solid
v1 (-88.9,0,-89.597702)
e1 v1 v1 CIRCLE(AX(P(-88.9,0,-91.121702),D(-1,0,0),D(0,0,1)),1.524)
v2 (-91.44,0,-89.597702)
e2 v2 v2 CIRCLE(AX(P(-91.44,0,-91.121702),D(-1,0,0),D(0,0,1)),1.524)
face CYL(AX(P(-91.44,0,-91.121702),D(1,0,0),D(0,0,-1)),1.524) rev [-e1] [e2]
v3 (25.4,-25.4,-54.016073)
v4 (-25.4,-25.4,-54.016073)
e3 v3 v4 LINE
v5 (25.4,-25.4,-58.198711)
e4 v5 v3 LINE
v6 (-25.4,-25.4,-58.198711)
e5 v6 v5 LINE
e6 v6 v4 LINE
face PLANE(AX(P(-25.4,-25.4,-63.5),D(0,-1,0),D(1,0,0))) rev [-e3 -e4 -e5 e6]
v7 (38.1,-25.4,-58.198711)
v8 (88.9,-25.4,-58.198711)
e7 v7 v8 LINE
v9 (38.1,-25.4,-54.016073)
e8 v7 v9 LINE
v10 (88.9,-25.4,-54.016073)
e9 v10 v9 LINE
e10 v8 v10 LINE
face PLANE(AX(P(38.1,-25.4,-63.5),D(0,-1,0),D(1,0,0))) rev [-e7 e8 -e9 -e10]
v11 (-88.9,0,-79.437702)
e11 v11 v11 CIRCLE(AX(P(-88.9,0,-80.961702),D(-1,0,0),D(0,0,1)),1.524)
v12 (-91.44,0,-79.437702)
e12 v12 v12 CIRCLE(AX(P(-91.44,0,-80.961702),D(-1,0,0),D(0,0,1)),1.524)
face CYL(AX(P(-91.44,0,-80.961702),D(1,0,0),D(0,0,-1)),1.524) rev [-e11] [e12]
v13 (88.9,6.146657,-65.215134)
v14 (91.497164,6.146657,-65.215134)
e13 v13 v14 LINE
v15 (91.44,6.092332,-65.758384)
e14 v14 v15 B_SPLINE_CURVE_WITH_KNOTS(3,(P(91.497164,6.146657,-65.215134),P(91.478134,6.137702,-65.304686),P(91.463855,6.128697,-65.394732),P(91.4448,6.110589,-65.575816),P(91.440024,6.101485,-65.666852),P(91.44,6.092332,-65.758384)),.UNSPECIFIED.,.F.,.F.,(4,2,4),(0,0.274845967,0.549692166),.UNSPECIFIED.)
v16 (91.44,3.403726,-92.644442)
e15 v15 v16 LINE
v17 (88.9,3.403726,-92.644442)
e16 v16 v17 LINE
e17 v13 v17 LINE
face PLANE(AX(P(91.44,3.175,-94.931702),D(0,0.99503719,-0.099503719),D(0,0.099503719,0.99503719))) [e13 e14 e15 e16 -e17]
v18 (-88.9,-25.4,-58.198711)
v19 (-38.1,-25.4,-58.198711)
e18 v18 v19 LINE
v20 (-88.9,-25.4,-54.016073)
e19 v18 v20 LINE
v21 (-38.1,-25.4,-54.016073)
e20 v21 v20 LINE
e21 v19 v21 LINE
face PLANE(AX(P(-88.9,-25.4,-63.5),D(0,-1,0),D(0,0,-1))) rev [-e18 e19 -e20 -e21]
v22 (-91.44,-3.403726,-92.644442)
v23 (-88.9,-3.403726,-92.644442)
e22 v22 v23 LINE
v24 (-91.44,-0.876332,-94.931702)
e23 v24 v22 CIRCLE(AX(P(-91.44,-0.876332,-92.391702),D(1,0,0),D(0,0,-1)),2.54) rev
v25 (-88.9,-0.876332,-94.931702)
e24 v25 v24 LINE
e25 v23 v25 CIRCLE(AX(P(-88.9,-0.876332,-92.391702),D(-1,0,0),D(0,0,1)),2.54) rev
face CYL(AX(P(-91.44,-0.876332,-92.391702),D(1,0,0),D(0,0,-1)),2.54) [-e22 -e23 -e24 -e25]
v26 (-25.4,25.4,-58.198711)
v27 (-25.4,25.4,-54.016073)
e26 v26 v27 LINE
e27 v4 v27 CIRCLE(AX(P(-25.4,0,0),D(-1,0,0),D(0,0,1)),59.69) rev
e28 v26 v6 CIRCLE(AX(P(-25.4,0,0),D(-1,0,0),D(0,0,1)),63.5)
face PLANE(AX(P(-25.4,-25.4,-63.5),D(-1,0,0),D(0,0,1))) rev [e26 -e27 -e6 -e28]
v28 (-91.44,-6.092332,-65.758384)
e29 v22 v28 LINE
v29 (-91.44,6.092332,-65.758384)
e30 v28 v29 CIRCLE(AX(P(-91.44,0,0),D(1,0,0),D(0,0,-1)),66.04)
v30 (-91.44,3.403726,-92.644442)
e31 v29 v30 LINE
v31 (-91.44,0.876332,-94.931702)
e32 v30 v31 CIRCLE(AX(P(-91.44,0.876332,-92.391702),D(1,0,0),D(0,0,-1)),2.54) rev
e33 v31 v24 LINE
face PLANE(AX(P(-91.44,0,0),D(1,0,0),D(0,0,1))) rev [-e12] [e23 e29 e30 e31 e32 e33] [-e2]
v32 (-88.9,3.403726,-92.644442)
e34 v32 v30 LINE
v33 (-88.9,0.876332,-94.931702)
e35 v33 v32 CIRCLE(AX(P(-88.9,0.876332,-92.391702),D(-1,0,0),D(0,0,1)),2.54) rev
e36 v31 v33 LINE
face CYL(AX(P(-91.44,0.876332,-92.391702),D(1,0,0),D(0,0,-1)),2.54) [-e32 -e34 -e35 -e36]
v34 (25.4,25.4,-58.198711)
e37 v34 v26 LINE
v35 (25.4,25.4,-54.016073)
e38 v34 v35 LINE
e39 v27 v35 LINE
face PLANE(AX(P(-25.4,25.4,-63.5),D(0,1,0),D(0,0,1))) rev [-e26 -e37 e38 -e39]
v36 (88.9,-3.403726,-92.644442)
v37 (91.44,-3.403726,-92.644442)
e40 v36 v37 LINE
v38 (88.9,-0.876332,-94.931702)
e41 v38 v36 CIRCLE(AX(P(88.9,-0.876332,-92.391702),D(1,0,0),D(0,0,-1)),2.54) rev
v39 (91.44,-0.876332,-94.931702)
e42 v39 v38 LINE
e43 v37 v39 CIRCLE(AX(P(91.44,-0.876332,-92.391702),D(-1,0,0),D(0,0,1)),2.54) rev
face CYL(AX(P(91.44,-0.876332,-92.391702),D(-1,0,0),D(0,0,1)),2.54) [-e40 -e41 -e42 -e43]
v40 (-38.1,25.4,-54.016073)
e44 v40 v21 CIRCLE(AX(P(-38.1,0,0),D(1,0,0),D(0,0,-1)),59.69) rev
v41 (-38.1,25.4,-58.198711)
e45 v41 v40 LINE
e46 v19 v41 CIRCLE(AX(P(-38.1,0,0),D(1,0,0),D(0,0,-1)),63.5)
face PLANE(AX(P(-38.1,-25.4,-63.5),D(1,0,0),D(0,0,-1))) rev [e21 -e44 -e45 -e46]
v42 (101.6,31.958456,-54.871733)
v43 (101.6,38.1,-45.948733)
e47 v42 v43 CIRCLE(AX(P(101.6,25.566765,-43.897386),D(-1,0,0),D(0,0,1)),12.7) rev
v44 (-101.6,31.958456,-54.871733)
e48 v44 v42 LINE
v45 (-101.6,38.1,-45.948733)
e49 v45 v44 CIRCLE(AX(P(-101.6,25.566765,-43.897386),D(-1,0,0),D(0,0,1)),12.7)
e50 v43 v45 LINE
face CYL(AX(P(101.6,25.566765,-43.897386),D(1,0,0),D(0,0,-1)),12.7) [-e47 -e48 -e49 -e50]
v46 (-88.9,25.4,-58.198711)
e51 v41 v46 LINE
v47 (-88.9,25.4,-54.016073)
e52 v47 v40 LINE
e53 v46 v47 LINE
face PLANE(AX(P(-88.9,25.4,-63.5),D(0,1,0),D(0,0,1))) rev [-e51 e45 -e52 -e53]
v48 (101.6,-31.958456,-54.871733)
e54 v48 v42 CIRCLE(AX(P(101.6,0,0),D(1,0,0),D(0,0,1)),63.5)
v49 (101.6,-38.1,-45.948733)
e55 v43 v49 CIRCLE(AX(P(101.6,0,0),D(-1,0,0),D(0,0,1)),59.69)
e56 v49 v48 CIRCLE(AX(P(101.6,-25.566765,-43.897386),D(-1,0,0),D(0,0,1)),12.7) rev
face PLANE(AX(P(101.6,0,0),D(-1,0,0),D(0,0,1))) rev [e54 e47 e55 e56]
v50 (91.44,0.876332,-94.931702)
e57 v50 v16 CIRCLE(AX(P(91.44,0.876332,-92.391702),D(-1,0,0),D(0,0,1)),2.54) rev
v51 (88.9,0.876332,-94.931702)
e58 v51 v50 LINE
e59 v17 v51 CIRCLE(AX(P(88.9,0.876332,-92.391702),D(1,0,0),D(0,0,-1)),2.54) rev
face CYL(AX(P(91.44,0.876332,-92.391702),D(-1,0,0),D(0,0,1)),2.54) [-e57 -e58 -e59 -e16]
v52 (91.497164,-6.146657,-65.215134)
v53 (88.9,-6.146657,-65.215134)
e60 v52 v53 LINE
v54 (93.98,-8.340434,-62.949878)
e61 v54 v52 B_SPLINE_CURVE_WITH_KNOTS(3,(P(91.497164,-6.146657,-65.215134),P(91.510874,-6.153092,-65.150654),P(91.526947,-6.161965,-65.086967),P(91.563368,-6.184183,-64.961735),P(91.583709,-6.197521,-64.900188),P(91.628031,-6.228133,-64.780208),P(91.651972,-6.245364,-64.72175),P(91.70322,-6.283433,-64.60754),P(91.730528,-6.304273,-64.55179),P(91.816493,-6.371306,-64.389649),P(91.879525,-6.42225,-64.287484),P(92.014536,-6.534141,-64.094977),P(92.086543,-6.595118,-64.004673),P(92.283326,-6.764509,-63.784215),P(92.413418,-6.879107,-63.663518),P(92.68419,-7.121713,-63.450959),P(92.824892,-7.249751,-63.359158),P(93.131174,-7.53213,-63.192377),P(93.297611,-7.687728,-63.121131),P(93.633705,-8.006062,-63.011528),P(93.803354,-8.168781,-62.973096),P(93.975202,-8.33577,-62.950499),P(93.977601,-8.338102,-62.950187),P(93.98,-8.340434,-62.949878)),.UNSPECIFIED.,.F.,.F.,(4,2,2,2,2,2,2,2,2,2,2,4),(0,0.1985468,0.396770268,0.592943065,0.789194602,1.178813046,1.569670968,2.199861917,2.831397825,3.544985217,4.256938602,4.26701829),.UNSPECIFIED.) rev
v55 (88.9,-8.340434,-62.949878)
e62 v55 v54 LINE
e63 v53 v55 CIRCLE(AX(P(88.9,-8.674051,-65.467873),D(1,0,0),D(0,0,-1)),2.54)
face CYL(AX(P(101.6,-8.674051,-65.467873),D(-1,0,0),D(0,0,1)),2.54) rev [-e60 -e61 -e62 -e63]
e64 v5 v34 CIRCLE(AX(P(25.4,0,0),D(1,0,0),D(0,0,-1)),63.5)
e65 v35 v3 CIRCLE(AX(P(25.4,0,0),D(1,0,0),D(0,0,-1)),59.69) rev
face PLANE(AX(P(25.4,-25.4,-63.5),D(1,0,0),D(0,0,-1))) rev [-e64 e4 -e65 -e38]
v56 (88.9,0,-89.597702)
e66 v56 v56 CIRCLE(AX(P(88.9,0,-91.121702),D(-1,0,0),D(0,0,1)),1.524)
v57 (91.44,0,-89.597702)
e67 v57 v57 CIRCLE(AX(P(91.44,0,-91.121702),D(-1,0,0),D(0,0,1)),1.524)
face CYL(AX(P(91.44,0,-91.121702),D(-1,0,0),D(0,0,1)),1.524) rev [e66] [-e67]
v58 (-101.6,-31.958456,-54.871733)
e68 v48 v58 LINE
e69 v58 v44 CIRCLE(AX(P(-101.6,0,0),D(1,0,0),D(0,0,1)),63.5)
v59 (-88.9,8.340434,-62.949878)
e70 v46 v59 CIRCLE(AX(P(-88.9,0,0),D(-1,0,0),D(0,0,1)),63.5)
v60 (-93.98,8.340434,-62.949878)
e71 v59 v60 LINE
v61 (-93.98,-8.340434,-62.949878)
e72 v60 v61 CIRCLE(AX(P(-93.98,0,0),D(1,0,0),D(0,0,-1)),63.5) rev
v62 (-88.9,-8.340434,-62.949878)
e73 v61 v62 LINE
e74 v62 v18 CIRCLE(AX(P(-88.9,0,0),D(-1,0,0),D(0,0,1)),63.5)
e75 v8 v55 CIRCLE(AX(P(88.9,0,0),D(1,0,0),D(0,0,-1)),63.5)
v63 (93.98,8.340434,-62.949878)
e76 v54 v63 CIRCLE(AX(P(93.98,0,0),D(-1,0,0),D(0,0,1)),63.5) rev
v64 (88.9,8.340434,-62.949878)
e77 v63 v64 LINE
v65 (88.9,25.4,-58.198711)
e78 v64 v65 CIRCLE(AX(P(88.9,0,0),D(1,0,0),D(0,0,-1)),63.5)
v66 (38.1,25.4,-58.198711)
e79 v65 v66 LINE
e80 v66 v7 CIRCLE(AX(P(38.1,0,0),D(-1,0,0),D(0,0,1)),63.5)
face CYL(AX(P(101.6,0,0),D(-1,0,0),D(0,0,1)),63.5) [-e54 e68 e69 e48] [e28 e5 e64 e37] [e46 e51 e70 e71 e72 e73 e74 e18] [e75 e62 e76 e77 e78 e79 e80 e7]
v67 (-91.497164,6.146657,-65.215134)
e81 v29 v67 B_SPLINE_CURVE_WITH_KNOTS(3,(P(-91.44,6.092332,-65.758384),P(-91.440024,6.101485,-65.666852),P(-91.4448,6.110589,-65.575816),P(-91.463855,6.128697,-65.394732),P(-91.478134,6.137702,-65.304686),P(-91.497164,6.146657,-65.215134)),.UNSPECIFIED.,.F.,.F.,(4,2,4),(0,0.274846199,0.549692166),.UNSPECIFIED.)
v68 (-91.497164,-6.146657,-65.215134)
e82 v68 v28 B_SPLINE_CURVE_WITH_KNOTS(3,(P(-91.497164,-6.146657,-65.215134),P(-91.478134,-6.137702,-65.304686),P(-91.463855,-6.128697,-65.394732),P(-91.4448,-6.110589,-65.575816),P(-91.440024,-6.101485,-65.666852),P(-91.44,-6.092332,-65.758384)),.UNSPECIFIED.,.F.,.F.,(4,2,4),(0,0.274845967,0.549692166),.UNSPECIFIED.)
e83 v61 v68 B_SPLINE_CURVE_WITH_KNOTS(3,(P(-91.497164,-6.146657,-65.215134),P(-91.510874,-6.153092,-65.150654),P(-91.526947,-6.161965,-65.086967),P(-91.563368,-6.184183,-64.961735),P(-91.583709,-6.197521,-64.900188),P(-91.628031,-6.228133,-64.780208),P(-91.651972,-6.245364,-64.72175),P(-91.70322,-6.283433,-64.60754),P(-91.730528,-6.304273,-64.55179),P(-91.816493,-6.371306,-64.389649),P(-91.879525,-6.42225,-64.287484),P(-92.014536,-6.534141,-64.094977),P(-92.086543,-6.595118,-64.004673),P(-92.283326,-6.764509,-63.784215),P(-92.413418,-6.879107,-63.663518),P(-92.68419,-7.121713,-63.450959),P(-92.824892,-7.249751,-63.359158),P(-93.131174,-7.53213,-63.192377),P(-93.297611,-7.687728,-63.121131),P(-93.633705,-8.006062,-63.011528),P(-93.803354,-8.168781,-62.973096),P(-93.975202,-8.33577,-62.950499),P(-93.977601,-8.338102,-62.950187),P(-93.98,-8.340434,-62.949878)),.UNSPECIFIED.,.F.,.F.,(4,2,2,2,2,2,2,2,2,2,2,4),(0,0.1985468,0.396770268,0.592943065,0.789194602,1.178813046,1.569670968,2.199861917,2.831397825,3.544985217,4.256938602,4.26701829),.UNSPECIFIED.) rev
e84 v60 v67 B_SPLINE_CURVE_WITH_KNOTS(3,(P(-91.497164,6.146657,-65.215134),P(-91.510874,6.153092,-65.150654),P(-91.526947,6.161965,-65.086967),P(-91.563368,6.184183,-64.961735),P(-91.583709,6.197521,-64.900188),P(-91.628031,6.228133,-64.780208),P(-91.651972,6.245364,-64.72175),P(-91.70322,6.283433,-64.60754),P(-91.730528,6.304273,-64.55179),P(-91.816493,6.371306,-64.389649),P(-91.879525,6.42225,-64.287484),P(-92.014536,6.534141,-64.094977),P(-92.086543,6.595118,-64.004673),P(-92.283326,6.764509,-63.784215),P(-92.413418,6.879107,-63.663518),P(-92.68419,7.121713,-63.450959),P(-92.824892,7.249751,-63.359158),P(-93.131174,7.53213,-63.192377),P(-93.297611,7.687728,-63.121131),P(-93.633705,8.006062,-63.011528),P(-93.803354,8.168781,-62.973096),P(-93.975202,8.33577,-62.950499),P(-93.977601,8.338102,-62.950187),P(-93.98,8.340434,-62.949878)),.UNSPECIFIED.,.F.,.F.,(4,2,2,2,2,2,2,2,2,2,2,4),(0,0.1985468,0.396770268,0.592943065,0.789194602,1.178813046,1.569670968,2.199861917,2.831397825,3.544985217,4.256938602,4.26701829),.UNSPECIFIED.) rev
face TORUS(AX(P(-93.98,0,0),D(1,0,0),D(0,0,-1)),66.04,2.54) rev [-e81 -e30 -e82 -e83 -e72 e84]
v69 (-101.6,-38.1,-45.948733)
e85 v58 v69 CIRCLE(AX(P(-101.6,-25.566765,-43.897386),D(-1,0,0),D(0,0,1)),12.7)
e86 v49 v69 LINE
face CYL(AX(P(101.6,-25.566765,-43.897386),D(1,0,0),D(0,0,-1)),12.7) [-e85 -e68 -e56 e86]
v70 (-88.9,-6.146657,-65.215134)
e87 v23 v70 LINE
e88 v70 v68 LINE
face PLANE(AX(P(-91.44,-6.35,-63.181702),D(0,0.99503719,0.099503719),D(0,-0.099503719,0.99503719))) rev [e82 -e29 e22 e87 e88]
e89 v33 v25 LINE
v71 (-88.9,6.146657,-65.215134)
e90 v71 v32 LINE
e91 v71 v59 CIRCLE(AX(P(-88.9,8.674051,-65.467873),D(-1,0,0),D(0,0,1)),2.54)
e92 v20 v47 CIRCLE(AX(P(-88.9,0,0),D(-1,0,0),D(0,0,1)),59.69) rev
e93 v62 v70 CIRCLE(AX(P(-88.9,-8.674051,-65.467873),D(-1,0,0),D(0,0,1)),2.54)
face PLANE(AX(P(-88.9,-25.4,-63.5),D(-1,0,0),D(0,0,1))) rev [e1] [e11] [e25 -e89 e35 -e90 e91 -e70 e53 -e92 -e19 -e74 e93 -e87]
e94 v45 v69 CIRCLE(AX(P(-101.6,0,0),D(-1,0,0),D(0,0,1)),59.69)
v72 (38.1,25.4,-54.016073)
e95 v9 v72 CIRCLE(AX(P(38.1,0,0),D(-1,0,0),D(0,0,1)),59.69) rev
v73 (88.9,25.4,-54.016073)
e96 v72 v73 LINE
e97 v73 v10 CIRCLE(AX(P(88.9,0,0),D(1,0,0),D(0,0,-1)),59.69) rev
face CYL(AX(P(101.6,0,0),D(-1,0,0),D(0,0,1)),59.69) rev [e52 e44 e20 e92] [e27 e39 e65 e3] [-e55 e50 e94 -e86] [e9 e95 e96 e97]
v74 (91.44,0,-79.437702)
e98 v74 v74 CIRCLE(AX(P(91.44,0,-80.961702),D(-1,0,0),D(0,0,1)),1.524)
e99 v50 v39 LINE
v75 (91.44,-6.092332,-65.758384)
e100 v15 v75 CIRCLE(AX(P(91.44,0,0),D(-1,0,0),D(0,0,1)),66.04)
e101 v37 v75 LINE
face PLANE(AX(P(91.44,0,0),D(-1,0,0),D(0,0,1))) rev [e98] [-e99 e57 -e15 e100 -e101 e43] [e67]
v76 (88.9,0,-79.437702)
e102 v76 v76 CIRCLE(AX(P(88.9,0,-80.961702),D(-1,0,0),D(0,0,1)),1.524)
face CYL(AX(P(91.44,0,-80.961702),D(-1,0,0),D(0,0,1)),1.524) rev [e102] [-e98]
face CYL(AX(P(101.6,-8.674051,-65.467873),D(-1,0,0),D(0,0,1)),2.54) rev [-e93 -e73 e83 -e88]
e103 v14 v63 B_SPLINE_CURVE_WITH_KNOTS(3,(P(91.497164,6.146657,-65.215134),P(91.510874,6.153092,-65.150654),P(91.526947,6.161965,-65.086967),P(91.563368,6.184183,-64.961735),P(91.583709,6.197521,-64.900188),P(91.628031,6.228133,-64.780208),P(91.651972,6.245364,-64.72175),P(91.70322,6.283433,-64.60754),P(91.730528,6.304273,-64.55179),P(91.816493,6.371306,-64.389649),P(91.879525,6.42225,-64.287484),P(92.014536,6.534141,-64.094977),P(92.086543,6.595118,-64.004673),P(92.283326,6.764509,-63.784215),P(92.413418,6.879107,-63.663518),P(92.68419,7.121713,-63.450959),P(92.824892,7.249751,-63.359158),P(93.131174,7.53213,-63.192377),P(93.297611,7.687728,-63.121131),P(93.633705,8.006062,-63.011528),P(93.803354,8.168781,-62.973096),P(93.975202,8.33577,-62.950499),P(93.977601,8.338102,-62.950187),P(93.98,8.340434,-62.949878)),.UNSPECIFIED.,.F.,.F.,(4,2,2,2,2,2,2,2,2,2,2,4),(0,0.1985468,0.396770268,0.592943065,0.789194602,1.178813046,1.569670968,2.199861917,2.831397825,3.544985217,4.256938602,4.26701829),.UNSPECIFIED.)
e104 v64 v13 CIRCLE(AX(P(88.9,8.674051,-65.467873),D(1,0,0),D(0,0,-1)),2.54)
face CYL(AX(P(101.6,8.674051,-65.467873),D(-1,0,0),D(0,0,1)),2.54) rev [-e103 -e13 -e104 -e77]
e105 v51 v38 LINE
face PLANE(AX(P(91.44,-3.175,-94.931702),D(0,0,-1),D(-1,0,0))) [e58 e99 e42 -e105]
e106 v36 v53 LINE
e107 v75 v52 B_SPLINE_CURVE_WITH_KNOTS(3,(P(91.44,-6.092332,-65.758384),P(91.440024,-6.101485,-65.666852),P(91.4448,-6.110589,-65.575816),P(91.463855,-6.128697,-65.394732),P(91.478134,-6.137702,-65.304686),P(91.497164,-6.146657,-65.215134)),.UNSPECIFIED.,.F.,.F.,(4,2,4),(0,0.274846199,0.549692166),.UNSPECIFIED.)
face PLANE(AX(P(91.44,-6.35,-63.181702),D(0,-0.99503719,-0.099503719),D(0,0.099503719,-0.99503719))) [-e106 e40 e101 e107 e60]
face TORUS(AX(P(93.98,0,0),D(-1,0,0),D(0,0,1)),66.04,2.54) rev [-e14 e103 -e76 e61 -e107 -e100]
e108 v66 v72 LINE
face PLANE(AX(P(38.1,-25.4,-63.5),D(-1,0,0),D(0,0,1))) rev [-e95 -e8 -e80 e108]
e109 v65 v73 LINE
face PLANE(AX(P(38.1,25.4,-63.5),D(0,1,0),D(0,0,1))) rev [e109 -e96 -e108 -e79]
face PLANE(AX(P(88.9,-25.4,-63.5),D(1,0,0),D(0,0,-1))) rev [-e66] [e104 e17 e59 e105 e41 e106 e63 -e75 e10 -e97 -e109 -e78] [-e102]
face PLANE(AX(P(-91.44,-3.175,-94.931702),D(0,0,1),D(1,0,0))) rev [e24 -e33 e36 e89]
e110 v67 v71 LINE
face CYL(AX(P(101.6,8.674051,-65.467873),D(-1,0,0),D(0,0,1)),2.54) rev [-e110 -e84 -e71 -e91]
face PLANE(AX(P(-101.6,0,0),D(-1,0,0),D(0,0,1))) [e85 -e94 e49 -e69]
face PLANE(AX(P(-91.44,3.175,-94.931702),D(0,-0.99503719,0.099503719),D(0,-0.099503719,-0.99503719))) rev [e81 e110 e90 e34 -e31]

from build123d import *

# Parameters (mm, degrees)
BOSS_EXTRUDE1_DEPTH = 101.6
SKETCH2_W           = 50.8
SKETCH2_H           = 50.8
CUT_EXTRUDE1_DEPTH  = 126.723585695
FILLET1_R           = 12.7
BOSS_EXTRUDE4_START = -2.54
SKETCH6_R           = 1.524
BOSS_EXTRUDE4_DEPTH = 2.54
FILLET4_R           = 2.54


with BuildPart() as part:
    # Sketch1 → Boss-Extrude1 (new, symmetric)
    with BuildSketch(Plane(origin=(0, 0, 0), x_dir=(0, 0, -1), z_dir=(1, 0, 0))):
        with BuildLine():
            Line((50.8, -38.1), (45.948733388, -38.1))
            ThreePointArc((45.948733388, -38.1), (59.69, 0), (45.948733388, 38.1))
            Line((45.948733388, 38.1), (50.8, 38.1))
            ThreePointArc((50.8, 38.1), (63.5, 0), (50.8, -38.1))
        make_face()
    extrude(amount=BOSS_EXTRUDE1_DEPTH, both=True)

    # Sketch2 → Cut-Extrude1 (cut, through all)
    with BuildSketch(Plane.XY):
        with Locations((-63.5, 0)):
            Rectangle(SKETCH2_W, SKETCH2_H)
        with Locations((63.5, 0)):
            Rectangle(SKETCH2_W, SKETCH2_H)
        Rectangle(SKETCH2_W, SKETCH2_H)
    extrude(amount=-CUT_EXTRUDE1_DEPTH, mode=Mode.SUBTRACT)

    # Fillet1
    # the kernel refuses this fillet: 12.7 mm, written as the material it takes off along each edge
    with BuildSketch(Plane(origin=(-120.021720302, 38.1, -50.8), x_dir=(0, -0.8334649822738217, -0.5525722788226877), z_dir=(1, 0, 0))) as fillet1_piece_1:
        with BuildLine():
            CenterArc((6.631819309, -12.678604985), FILLET1_R, 86.673763994, 50.487243594)
            Line((-2.680675447, -4.04336084), (-2.866925342, -3.870655958))
            ThreePointArc((-2.866925342, -3.870655958), (-1.552037829, -1.881327061), (-0.211700105, 0.140353359))
            Line((-0.211700105, 0.140353359), (-0.014737376, 0.2535721))
            ThreePointArc((-0.014737376, 0.2535721), (3.68434406, 0.360975077), (7.383425497, 0.2535721))
            Line((7.383425497, 0.2535721), (7.368688121, 0))
        make_face()
    extrude(amount=240.043440604, mode=Mode.SUBTRACT)
    with BuildSketch(Plane(origin=(-120.021720302, -38.1, -50.8), x_dir=(0, 0, 1), z_dir=(1, 0, 0))) as fillet1_piece_2:
        with BuildLine():
            CenterArc((6.90261377, -12.533234811), FILLET1_R, 99.295330772, 50.487243594)
            Line((-4.071732787, -6.141543514), (-4.291219718, -6.013709688))
            ThreePointArc((-4.291219718, -6.013709688), (-2.33672648, -2.871306936), (-0.2032, 0.1524))
            Line((-0.2032, 0.1524), (0, 0.254))
            ThreePointArc((0, 0.254), (2.425633306, 0.254), (4.810239668, 0.250664696))
            Line((4.810239668, 0.250664696), (4.851266612, 0))
        make_face()
    extrude(amount=240.043440604, mode=Mode.SUBTRACT)

    # Sketch6 → Boss-Extrude4 (add)
    with BuildSketch(Plane.ZY.offset(-88.9).offset(BOSS_EXTRUDE4_START)):
        with BuildLine():
            Line((-63.181702256, -6.35), (-94.931702256, -3.175))
            Line((-94.931702256, -3.175), (-94.931702256, 3.175))
            Line((-94.931702256, 3.175), (-63.181702256, 6.35))
            ThreePointArc((-63.181702256, 6.35), (-63.5, 0), (-63.181702256, -6.35))
        make_face()
        with Locations((-91.121702256, 0)):
            Circle(SKETCH6_R, mode=Mode.SUBTRACT)
        with Locations((-80.961702256, 0)):
            Circle(SKETCH6_R, mode=Mode.SUBTRACT)
    boss_extrude4 = extrude(amount=BOSS_EXTRUDE4_DEPTH)

    # Mirror2: Boss-Extrude4 across plane
    add(boss_extrude4.mirror(Plane(origin=(0, 0, 0), x_dir=(0, 0, 1), z_dir=(1, 0, 0))))

    # Fillet4
    fillet4_edges = [part.edges().sort_by_distance(p)[0] for p in [
        (90.17, 6.35, -63.181702256),
        (90.17, -6.35, -63.181702256),
        (90.17, -3.175, -94.931702256),
        (90.17, 3.175, -94.931702256),
        (-91.44, 0, -63.5),
        (-90.17, -6.35, -63.181702256),
        (-90.17, 6.35, -63.181702256),
        (-90.17, 3.175, -94.931702256),
        (-90.17, -3.175, -94.931702256),
        (91.44, 0, -63.5),
    ]]
    fillet(fillet4_edges, radius=FILLET4_R)


solid = part.part
